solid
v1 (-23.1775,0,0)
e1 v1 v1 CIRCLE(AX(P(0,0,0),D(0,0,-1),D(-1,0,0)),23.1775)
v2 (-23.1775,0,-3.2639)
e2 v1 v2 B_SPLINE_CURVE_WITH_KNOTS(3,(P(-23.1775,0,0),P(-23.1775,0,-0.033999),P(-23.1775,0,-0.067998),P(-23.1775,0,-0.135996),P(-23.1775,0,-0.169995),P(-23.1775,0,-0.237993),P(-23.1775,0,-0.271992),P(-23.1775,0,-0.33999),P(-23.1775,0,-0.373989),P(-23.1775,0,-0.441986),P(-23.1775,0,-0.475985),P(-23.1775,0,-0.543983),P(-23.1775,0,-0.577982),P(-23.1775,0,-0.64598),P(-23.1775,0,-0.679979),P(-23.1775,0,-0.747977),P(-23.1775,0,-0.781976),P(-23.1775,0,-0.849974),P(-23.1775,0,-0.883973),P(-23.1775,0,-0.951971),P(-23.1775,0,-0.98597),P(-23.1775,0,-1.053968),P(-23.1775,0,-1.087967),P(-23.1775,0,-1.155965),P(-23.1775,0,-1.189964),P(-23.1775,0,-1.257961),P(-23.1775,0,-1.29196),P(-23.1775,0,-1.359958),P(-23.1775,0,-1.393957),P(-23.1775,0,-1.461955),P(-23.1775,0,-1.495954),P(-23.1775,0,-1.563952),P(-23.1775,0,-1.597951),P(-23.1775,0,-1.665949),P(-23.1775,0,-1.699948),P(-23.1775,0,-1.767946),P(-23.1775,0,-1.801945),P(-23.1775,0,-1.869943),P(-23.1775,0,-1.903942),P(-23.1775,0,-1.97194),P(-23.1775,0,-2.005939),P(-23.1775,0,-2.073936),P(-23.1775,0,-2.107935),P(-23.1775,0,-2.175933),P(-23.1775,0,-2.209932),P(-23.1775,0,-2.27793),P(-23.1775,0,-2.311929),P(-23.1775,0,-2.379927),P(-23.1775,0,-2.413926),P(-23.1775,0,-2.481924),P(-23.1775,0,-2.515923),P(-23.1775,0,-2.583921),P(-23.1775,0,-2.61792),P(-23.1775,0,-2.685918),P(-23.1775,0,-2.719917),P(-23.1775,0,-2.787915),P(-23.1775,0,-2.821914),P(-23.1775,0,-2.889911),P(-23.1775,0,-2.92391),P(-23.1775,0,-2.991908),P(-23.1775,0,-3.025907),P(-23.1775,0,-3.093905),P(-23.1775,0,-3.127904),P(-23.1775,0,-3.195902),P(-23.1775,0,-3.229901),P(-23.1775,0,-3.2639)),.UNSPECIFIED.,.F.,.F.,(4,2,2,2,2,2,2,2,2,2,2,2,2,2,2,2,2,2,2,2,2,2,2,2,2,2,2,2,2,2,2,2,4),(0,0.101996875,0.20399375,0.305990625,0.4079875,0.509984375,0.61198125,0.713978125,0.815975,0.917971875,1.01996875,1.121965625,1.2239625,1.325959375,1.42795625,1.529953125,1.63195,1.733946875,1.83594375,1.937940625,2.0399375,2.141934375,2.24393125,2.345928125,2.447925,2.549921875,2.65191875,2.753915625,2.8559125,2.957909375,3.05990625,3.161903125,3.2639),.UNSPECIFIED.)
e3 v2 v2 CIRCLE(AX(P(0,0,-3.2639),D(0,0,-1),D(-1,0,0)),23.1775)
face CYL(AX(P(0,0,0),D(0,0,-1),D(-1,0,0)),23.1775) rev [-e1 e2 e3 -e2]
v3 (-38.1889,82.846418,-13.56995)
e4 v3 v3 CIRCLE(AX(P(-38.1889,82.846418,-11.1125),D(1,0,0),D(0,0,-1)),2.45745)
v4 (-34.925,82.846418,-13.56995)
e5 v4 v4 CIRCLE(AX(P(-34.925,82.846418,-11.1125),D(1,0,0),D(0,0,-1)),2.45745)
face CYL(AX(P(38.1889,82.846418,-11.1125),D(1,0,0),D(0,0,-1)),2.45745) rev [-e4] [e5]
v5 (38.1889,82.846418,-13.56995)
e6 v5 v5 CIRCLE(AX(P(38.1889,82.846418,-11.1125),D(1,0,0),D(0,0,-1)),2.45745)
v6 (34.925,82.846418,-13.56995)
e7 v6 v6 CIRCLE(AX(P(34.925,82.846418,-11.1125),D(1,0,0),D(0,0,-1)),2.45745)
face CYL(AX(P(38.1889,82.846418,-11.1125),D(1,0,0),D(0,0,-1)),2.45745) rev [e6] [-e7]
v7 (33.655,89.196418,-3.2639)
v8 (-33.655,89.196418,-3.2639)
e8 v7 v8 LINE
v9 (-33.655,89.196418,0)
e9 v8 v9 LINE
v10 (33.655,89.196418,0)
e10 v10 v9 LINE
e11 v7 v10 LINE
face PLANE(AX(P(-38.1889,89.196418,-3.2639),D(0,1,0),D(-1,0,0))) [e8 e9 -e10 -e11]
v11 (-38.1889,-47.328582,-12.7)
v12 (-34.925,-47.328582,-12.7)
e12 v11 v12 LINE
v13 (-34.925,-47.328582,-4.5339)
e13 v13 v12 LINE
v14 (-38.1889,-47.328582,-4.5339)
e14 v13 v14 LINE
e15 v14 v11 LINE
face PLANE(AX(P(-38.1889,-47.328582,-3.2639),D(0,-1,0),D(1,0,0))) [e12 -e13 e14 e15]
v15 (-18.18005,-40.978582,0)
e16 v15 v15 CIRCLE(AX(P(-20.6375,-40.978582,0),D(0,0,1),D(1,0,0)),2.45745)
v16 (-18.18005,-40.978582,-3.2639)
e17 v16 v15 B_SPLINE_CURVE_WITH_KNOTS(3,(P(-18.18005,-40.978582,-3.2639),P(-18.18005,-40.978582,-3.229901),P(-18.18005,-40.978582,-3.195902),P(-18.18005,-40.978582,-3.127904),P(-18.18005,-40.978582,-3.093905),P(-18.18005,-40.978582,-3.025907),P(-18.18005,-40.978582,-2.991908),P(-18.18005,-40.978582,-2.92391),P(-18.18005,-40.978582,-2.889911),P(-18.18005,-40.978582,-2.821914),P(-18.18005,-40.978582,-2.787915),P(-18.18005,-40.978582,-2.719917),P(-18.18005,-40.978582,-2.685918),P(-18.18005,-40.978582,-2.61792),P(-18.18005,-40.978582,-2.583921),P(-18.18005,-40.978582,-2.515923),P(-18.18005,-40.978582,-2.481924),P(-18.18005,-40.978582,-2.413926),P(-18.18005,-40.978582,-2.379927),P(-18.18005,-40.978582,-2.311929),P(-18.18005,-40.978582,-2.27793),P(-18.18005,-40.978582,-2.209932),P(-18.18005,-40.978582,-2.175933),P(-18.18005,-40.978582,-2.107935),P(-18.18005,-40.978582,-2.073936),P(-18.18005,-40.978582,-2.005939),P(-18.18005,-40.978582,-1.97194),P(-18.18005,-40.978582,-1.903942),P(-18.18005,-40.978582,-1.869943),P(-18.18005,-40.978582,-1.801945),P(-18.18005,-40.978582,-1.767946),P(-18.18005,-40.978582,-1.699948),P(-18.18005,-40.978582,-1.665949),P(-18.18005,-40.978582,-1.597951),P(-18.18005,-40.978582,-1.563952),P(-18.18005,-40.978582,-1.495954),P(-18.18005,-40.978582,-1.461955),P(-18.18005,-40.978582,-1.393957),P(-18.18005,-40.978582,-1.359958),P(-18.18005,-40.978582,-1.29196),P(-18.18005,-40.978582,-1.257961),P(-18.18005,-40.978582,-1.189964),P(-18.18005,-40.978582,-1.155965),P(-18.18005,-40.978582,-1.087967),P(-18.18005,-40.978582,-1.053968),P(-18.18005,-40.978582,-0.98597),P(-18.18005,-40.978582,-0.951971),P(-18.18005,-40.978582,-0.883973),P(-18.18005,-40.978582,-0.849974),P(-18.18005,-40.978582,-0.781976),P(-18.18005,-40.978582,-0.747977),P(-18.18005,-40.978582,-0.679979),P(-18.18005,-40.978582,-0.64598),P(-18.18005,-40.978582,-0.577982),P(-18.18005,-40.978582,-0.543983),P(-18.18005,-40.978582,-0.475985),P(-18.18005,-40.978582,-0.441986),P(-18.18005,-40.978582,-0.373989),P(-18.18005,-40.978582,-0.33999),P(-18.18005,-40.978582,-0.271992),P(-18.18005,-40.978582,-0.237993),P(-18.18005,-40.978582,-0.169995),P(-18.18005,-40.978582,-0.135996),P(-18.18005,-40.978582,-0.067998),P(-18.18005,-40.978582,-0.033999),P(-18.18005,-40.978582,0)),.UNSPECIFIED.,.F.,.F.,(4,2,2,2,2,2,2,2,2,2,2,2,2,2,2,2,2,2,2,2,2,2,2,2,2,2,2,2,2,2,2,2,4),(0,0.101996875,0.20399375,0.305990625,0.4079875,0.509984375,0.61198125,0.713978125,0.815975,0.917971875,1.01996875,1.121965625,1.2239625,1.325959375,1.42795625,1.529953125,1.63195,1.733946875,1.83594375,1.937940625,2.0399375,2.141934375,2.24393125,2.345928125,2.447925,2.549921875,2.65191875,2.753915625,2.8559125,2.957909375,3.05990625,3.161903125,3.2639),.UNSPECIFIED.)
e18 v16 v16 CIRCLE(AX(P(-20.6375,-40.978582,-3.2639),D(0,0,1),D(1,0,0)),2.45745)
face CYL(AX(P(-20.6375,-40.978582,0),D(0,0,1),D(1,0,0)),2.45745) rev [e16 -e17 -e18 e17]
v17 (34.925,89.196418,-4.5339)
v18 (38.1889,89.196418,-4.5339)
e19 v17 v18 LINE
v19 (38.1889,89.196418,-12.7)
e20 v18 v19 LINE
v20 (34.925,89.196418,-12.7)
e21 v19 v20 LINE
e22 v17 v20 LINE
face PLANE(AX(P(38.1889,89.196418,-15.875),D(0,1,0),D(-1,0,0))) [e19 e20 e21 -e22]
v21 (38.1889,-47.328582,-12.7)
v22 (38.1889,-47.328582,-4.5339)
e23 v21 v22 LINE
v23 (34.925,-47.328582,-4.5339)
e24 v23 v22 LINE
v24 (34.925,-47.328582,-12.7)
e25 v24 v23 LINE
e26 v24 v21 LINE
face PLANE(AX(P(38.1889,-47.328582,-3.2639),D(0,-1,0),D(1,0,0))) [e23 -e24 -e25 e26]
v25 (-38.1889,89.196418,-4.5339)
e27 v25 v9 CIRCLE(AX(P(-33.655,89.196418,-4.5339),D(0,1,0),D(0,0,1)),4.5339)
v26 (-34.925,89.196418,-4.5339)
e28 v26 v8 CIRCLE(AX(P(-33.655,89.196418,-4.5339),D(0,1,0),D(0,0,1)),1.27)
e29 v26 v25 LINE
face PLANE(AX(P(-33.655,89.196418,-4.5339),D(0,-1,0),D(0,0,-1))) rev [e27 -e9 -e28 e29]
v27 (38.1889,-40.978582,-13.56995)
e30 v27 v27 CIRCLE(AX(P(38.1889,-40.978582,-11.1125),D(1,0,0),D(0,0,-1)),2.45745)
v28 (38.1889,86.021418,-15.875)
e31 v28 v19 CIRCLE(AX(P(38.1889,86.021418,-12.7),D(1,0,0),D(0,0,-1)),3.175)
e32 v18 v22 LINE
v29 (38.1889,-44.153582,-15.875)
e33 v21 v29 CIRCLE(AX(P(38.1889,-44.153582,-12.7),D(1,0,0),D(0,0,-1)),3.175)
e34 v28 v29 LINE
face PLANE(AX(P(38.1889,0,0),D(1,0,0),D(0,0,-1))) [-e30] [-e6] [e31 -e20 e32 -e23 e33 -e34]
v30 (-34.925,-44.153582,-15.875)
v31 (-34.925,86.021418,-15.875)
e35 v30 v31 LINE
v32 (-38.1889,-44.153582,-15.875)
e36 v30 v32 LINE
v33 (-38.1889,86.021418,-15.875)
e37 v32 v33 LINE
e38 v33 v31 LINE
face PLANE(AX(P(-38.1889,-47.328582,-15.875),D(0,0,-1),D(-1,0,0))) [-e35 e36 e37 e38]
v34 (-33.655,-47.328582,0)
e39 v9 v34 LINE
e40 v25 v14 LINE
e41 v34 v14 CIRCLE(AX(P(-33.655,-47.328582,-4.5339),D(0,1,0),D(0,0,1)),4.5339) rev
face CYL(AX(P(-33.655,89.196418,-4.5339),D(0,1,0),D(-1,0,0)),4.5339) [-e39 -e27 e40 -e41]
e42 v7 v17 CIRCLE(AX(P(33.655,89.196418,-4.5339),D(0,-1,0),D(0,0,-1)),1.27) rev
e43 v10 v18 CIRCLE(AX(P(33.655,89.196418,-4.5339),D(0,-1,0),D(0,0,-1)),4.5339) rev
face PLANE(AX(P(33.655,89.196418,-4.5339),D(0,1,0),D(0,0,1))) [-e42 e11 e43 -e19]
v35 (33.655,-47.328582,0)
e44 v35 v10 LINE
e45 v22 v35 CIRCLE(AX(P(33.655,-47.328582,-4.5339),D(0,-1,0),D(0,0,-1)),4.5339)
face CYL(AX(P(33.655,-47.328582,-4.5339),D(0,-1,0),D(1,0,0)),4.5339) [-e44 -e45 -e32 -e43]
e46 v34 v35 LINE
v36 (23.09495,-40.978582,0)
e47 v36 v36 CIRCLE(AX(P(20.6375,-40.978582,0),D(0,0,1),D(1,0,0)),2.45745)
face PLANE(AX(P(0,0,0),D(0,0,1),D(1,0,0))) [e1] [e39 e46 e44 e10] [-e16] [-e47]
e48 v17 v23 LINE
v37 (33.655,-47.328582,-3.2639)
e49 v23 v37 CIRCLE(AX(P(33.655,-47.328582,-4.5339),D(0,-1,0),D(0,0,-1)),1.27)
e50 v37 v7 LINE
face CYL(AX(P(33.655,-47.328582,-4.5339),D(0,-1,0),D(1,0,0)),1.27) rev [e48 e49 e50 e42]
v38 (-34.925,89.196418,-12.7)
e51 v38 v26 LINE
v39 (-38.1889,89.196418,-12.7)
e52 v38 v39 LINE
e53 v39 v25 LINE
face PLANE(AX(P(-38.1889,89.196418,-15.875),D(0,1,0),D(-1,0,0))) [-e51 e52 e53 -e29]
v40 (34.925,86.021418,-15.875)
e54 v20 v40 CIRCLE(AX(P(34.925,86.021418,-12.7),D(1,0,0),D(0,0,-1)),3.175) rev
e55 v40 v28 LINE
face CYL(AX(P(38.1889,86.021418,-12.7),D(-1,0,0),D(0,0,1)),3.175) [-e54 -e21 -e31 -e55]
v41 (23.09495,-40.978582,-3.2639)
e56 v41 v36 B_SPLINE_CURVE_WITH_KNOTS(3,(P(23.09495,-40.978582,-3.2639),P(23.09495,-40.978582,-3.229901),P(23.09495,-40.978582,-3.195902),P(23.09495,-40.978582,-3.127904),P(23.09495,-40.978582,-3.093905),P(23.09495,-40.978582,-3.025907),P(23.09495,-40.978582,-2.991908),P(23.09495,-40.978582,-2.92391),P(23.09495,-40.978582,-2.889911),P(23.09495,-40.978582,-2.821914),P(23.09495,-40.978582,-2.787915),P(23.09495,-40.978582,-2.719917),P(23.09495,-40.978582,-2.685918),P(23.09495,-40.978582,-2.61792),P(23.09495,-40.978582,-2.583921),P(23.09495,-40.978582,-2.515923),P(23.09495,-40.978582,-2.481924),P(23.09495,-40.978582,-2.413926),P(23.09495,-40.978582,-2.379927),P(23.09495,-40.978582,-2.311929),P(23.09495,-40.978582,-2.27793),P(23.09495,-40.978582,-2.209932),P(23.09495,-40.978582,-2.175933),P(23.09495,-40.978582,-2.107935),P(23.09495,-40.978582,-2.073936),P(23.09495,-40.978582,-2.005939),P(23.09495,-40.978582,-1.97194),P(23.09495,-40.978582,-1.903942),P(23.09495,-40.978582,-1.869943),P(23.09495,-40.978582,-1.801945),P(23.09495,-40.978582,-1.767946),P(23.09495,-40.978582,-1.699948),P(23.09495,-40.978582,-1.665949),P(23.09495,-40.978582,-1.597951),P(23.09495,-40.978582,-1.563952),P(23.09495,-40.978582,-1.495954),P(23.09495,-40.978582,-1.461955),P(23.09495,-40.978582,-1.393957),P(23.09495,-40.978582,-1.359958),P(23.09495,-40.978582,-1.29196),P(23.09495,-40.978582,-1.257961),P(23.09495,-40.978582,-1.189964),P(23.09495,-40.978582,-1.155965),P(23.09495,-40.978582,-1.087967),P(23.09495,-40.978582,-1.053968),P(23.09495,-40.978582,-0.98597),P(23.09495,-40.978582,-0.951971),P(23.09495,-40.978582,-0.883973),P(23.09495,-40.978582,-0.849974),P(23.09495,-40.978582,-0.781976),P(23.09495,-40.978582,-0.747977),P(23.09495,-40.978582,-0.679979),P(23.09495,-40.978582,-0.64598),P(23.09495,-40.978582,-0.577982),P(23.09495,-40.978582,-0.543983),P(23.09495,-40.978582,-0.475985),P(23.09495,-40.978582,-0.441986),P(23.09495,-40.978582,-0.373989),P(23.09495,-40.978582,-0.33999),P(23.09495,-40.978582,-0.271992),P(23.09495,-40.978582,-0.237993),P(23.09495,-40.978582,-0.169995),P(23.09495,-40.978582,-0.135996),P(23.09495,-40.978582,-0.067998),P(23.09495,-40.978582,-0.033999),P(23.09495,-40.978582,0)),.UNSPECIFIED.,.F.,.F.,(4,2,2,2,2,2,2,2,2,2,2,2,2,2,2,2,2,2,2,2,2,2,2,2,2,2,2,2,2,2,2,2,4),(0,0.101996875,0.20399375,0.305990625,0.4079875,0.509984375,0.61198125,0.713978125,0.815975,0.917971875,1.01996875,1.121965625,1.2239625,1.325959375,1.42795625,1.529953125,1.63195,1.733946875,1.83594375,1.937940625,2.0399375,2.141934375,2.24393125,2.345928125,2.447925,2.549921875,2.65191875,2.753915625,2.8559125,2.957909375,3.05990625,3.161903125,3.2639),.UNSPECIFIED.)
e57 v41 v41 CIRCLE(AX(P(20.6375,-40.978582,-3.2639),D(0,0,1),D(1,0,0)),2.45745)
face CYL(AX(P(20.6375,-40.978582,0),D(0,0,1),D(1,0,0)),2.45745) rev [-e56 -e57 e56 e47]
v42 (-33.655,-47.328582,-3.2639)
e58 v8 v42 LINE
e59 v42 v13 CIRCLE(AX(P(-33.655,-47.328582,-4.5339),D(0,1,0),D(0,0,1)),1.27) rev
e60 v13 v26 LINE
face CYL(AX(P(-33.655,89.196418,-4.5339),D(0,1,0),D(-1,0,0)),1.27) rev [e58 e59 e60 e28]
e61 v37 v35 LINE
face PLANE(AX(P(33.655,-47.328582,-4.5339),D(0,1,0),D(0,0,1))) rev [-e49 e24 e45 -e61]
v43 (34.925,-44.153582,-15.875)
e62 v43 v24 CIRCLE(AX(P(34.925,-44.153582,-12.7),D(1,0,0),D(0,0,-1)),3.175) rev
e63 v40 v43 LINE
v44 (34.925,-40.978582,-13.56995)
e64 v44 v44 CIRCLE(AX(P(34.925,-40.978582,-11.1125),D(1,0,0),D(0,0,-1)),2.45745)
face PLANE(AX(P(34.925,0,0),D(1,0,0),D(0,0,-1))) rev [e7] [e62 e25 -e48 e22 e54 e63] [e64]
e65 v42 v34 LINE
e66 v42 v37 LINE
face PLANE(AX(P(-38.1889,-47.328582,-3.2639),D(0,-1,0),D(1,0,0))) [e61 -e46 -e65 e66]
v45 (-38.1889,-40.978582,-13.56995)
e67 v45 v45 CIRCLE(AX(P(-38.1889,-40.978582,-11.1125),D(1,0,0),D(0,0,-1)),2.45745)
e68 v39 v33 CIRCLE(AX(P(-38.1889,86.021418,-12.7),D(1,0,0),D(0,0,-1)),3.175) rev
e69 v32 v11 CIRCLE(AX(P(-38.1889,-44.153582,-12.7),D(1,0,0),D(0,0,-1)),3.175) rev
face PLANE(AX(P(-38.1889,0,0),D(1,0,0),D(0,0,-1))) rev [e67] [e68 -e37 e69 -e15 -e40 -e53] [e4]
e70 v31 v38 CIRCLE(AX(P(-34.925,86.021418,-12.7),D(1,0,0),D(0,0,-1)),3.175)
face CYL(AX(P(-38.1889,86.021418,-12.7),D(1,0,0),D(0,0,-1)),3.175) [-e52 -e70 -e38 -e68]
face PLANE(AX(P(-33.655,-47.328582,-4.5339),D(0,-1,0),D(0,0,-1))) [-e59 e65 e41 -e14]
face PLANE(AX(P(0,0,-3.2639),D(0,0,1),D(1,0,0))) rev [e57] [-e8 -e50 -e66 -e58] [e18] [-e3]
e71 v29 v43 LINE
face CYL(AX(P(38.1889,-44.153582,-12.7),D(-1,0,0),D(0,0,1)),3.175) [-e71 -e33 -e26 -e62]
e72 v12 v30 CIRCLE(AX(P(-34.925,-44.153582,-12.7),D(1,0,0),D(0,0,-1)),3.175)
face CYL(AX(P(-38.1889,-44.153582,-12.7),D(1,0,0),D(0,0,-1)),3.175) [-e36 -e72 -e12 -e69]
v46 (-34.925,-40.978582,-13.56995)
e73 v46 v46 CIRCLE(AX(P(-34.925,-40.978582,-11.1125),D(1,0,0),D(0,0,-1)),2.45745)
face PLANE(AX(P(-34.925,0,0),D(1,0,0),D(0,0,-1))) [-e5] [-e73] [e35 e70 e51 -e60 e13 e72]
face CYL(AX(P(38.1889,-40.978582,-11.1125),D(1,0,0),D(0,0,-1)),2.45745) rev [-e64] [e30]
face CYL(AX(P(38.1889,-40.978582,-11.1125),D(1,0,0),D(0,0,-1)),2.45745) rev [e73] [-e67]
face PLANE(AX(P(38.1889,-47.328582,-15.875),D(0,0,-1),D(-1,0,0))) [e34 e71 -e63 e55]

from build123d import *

# Parameters (mm, degrees)
SKETCH1_W                      = 76.3778
SKETCH1_H                      = 136.525
BASE_FLANGE1_DEPTH             = 3.2639
EDGE_FLANGE1_STRIP_W           = 15.5956
EDGE_FLANGE1_STRIP_H           = 3.2639
EDGE_FLANGE1_STRIP_CUT_DEPTH   = 136.525
EDGE_FLANGE1_STRIP_2_W         = 15.5956
EDGE_FLANGE1_STRIP_2_H         = 3.2639
EDGE_FLANGE1_STRIP_CUT_2_DEPTH = 136.525
EDGE_FLANGE1_DEPTH             = 136.525
EDGE_FLANGE1_BEND_DEPTH        = 136.525
F_10_0_1935_DIAMETER_HOLE1_D   = 4.9149
SKETCH32_R                     = 23.1775
CUT_EXTRUDE1_DEPTH             = 98.843921173
F_10_0_1935_DIAMETER_HOLE2_D   = 4.9149
FILLET1_R                      = 3.175


# Sheet-metal steps are written as plain solids
with BuildPart() as part:
    # Sketch1 → Base-Flange1 (new body)
    with BuildSketch(Plane.XY):
        with Locations((0, 20.933918)):
            Rectangle(SKETCH1_W, SKETCH1_H)
    extrude(amount=-BASE_FLANGE1_DEPTH)

    # Edge-Flange1 strip (across the edge) → Edge-Flange1 strip cut (cut)
    with BuildSketch(Plane(origin=(38.1889, 89.196418, -3.2639), x_dir=(-1, 0, 0), z_dir=(0, -1, 0))):
        with Locations((-3.2639, -1.63195)):
            Rectangle(EDGE_FLANGE1_STRIP_W, EDGE_FLANGE1_STRIP_H)
    extrude(amount=EDGE_FLANGE1_STRIP_CUT_DEPTH, mode=Mode.SUBTRACT)

    # Edge-Flange1 strip 2 (across the edge) → Edge-Flange1 strip cut 2 (cut)
    with BuildSketch(Plane(origin=(-38.1889, -47.328582, -3.2639), x_dir=(1, 0, 0), z_dir=(0, 1, 0))):
        with Locations((-3.2639, -1.63195)):
            Rectangle(EDGE_FLANGE1_STRIP_2_W, EDGE_FLANGE1_STRIP_2_H)
    extrude(amount=EDGE_FLANGE1_STRIP_CUT_2_DEPTH, mode=Mode.SUBTRACT)

    # Edge-Flange1 section (across the edge) → Edge-Flange1 (add)
    with BuildSketch(Plane(origin=(38.1889, 89.196418, -3.2639), x_dir=(-1, 0, 0), z_dir=(0, -1, 0))):
        with BuildLine():
            Line((0, 1.27), (0, 12.6111))
            Line((0, 12.6111), (3.2639, 12.6111))
            Line((3.2639, 12.6111), (3.2639, 1.27))
            ThreePointArc((3.2639, 1.27), (3.635874388, 0.371974388), (4.5339, 0))
            Line((4.5339, 0), (4.5339, -3.2639))
            ThreePointArc((4.5339, -3.2639), (1.327948565, -1.935951435), (0, 1.27))
        make_face()
    extrude(amount=EDGE_FLANGE1_DEPTH)

    # Edge-Flange1 section 2 (across the edge) → Edge-Flange1 bend (add)
    with BuildSketch(Plane(origin=(-38.1889, -47.328582, -3.2639), x_dir=(1, 0, 0), z_dir=(0, 1, 0))):
        with BuildLine():
            Line((0, 1.27), (0, 12.6111))
            Line((0, 12.6111), (3.2639, 12.6111))
            Line((3.2639, 12.6111), (3.2639, 1.27))
            ThreePointArc((3.2639, 1.27), (3.635874388, 0.371974388), (4.5339, 0))
            Line((4.5339, 0), (4.5339, -3.2639))
            ThreePointArc((4.5339, -3.2639), (1.327948565, -1.935951435), (0, 1.27))
        make_face()
    extrude(amount=EDGE_FLANGE1_BEND_DEPTH)

    # #10 (0.1935) Diameter Hole1 (through all)
    with Locations(Plane(origin=(38.1889, 0, 0), x_dir=(0, 0, -1), z_dir=(1, 0, 0))):
        with Locations((11.1125, 82.846418), (11.1125, -40.978582)):
            Hole(F_10_0_1935_DIAMETER_HOLE1_D / 2)

    # Sketch32 → Cut-Extrude1 (cut, through all)
    with BuildSketch(Plane(origin=(0, 0, -3.2639), x_dir=(-1, 0, 0), z_dir=(0, 0, -1))):
        Circle(SKETCH32_R)
    extrude(amount=-CUT_EXTRUDE1_DEPTH, mode=Mode.SUBTRACT)

    # #10 (0.1935) Diameter Hole2 (through all)
    with Locations(Plane.XY):
        with Locations((-20.6375, -40.978582), (20.6375, -40.978582)):
            Hole(F_10_0_1935_DIAMETER_HOLE2_D / 2)

    # Fillet1
    fillet1_edges = [part.edges().sort_by_distance(p)[0] for p in [
        (36.55695, 89.196418, -15.875),
        (36.55695, -47.328582, -15.875),
        (-36.55695, -47.328582, -15.875),
        (-36.55695, 89.196418, -15.875),
    ]]
    fillet(fillet1_edges, radius=FILLET1_R)


solid = part.part
